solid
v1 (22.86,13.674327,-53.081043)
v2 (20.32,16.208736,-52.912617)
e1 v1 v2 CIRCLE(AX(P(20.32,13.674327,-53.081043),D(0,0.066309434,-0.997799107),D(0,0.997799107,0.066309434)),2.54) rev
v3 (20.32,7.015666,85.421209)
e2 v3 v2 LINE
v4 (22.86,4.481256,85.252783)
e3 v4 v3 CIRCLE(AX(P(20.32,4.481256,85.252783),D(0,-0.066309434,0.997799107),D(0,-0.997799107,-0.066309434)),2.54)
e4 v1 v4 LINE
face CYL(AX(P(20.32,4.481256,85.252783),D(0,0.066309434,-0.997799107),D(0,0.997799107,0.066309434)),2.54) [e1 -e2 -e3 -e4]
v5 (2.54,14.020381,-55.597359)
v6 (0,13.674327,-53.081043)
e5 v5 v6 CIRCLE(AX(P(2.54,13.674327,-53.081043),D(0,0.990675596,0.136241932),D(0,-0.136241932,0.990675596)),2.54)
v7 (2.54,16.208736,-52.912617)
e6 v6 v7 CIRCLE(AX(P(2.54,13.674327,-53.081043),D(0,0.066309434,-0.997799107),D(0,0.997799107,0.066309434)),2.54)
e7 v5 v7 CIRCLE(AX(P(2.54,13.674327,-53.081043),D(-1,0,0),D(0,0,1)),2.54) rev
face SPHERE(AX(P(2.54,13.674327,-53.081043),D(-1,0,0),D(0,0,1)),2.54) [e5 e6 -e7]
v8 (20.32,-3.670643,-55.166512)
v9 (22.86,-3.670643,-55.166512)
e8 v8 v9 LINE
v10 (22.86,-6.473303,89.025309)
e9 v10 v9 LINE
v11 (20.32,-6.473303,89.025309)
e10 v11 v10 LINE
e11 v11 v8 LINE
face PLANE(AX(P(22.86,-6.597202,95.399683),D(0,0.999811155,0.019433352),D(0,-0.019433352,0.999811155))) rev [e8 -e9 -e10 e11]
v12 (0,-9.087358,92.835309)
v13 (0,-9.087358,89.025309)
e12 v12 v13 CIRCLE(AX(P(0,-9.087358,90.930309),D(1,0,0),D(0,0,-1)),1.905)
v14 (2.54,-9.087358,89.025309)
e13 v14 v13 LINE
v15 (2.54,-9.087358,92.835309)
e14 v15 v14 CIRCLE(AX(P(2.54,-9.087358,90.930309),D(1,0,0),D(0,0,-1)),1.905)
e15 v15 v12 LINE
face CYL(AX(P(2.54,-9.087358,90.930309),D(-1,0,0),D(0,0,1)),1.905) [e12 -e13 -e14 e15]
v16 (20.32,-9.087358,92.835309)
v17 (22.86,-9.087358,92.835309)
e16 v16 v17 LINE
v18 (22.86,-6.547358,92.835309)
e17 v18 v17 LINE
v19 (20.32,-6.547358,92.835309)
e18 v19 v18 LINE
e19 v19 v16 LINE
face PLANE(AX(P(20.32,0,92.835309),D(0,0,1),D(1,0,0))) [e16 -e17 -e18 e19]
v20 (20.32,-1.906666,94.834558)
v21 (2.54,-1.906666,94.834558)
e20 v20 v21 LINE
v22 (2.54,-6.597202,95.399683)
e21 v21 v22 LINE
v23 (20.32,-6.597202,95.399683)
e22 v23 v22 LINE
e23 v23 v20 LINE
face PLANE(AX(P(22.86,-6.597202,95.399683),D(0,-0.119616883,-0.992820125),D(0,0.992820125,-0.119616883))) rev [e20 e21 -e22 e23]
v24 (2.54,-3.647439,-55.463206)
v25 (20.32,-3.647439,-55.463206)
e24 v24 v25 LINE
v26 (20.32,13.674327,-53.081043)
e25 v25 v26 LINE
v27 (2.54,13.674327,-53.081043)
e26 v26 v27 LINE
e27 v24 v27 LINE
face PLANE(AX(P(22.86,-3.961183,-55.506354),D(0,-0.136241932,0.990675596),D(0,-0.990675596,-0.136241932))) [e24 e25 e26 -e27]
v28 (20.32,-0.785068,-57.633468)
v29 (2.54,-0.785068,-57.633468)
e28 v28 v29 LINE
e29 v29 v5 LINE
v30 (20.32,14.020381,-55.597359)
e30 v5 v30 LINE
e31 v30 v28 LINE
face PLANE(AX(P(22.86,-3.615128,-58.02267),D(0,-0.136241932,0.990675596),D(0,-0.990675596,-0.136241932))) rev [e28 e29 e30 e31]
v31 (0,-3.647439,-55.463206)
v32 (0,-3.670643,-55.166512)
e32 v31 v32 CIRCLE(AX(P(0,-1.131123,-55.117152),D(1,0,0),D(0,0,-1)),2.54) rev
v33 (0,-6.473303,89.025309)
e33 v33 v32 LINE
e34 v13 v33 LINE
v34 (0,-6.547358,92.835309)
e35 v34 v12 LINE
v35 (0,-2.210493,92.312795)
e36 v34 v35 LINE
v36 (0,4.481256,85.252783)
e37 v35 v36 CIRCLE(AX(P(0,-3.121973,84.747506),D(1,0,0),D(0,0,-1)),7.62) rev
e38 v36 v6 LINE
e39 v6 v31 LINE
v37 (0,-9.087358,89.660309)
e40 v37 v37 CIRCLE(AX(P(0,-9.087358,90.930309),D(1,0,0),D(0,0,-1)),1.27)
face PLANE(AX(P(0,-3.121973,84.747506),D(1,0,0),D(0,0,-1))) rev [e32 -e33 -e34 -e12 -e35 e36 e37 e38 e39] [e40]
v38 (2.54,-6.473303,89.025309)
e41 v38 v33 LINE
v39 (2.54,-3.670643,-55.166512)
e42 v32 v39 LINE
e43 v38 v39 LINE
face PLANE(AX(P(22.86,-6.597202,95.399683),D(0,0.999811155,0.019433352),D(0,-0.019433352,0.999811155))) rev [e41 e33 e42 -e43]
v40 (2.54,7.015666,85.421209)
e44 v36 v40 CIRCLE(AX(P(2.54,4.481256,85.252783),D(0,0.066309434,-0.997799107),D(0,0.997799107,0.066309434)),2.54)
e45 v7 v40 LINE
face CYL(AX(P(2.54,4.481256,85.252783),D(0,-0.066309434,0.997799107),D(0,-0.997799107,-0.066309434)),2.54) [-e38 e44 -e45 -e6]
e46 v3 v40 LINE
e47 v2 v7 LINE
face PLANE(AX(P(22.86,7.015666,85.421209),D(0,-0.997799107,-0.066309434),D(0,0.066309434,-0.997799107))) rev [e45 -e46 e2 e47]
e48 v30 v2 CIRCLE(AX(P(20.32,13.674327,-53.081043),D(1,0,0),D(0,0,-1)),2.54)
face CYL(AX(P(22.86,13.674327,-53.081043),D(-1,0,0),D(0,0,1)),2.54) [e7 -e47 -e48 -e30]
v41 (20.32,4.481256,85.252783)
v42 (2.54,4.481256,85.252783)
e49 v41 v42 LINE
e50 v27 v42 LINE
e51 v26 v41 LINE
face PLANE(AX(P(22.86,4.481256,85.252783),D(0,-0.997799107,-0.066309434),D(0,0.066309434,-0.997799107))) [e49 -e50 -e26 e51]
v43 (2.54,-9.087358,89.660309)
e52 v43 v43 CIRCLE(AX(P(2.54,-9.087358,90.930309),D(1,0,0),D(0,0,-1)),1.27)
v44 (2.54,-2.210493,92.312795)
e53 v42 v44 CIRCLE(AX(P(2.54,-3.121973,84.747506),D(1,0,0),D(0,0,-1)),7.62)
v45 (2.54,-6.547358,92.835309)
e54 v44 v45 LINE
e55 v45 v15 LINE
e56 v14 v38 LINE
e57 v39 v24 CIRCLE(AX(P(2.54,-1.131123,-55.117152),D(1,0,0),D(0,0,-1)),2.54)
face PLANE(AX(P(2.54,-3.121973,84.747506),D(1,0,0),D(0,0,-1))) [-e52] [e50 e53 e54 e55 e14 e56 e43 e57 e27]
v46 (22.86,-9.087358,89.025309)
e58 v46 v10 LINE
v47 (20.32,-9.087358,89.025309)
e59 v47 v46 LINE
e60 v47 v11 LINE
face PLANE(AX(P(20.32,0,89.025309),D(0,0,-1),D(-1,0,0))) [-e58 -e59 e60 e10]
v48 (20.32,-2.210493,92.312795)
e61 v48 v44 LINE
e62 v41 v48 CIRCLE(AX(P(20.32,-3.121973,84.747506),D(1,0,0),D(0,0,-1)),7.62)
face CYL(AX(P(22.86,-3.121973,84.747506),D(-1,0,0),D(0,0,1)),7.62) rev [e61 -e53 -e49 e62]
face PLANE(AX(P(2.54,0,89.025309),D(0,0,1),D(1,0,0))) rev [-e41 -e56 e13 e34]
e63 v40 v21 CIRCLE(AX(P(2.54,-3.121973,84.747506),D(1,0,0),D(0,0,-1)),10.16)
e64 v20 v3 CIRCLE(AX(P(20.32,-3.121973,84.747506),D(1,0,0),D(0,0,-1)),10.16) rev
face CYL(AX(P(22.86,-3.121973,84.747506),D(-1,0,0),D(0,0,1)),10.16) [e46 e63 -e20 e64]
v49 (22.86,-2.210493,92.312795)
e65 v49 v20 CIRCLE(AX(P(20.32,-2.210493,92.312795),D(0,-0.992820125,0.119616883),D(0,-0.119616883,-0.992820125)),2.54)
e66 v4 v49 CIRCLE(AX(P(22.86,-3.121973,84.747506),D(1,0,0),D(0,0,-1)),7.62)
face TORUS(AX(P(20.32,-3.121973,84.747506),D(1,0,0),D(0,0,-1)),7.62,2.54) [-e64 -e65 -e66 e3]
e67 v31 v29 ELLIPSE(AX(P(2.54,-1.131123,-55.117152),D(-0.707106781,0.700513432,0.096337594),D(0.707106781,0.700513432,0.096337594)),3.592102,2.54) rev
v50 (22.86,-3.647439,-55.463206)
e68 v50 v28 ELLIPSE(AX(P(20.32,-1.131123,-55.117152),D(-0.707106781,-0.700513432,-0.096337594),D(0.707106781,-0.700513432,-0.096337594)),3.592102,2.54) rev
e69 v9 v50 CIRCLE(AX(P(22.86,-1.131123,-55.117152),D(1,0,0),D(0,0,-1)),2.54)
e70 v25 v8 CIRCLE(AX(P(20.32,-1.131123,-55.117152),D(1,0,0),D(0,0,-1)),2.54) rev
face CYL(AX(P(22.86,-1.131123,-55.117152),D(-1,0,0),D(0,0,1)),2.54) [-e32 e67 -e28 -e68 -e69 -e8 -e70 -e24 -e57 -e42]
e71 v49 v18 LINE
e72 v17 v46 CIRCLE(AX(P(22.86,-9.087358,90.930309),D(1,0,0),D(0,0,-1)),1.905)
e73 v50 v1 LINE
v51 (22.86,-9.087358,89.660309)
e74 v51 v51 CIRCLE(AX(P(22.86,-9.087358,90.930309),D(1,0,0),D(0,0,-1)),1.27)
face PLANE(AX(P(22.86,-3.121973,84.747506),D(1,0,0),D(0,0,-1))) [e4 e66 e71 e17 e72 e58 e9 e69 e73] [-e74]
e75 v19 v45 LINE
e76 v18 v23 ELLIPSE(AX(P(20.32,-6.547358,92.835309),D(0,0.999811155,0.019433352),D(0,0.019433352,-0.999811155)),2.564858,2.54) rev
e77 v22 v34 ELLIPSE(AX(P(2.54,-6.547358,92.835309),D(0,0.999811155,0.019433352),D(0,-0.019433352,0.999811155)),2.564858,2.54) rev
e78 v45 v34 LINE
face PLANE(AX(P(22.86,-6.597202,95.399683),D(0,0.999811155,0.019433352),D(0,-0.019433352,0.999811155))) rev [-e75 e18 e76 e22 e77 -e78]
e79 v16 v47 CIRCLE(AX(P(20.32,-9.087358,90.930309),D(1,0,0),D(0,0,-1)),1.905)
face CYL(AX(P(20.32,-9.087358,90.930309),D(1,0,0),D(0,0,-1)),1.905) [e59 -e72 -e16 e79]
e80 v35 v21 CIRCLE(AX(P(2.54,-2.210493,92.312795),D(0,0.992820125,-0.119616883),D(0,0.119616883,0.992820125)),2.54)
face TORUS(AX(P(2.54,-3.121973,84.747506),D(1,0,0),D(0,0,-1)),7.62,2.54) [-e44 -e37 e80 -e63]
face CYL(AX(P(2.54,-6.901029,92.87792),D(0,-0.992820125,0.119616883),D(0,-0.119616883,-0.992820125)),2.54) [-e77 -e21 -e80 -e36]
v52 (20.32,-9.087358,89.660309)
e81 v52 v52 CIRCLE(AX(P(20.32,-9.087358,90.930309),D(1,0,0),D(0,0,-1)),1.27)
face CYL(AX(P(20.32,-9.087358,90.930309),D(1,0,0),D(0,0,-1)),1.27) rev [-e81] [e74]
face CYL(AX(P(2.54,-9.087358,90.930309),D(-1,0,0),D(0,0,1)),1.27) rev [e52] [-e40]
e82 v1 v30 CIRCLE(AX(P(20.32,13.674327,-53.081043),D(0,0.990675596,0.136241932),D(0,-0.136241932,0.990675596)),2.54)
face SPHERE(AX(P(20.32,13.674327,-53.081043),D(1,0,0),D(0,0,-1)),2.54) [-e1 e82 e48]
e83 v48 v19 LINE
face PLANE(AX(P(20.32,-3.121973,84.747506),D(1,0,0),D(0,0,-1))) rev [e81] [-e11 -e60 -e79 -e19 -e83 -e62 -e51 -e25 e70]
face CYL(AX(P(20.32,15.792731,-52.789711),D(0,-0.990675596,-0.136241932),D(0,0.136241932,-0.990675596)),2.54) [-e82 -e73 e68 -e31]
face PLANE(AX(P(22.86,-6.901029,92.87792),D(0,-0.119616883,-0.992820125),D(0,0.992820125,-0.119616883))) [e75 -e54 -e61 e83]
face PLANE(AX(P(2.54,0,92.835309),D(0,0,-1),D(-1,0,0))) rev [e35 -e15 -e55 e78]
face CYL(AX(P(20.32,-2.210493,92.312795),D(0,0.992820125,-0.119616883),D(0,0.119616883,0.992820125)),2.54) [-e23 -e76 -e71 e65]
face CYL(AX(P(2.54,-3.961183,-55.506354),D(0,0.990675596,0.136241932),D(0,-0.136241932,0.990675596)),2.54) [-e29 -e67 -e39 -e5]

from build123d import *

# Parameters (mm, degrees)
BOSS_EXTRUDE1_DEPTH = 22.86
SHELL3_T            = -2.54
SKETCH2_R           = 1.27
BOSS_EXTRUDE2_DEPTH = 2.54
FILLET2_R           = 2.54


with BuildPart() as part:
    # Sketch1 → Boss-Extrude1 (new body)
    with BuildSketch(Plane(origin=(0, 0, 0), x_dir=(0, 0, -1), z_dir=(1, 0, 0))):
        with BuildLine():
            Line((-95.3996828, -6.597201831), (58.022669589, -3.615128074))
            Line((58.022669589, -3.615128074), (55.274818438, 16.365717982))
            Line((55.274818438, 16.365717982), (-85.421209368, 7.015665501))
            ThreePointArc((-85.421209368, 7.015665501), (-91.73681654, 4.25197608), (-94.834557989, -1.906665904))
            Line((-94.834557989, -1.906665904), (-95.3996828, -6.597201831))
        make_face()
    extrude(amount=BOSS_EXTRUDE1_DEPTH)

    # Shell3
    shell3_openings = [part.faces().sort_by_distance(p)[0] for p in [
        (11.43, -5.106164953, 18.688506605),
    ]]
    offset(amount=SHELL3_T, openings=shell3_openings, kind=Kind.INTERSECTION)

    # Sketch2 → Boss-Extrude2 (add)
    with BuildSketch(Plane(origin=(22.86, 0, 0), x_dir=(0, 0, -1), z_dir=(1, 0, 0))):
        with BuildLine():
            Line((-89.025308756, -6.473302977), (-92.835308756, -6.547358034))
            Line((-92.835308756, -6.547358034), (-92.835308756, -9.087358034))
            ThreePointArc((-92.835308756, -9.087358034), (-90.930308756, -10.992358034), (-89.025308756, -9.087358034))
            Line((-89.025308756, -9.087358034), (-89.025308756, -6.473302977))
        make_face()
        with Locations((-90.930308756, -9.087358034)):
            Circle(SKETCH2_R, mode=Mode.SUBTRACT)
    boss_extrude2 = extrude(amount=-BOSS_EXTRUDE2_DEPTH)

    # Mirror1: Boss-Extrude2 across plane
    add(boss_extrude2.mirror(Plane.ZY.offset(-11.43)))

    # Fillet2
    # the kernel refuses this fillet: 2.54 mm, written as the material it takes off along each edge
    with BuildSketch(Plane(origin=(2.54, 13.674326521, -53.081043163), x_dir=(0, 0.1362419322973002, -0.9906755956840251), z_dir=(-1, 0, 0))) as fillet2_piece_1_section:
        Polygon((0, 0), (FILLET2_R, 0), (FILLET2_R, -FILLET2_R * 0.932051833184), (FILLET2_R * 0.0702509400666, -FILLET2_R * 0.997529350656), align=None)
    fillet2_piece_1 = extrude(amount=FILLET2_R, mode=Mode.PRIVATE)
    fillet2_piece_1 = fillet2_piece_1 - Plane(origin=(2.54, 13.674326521, -53.081043163), x_dir=(0, -0.7751236084755375, 0.6318096165648808), z_dir=(-1, 0, 0)) * Sphere(FILLET2_R, mode=Mode.PRIVATE)
    add(fillet2_piece_1, mode=Mode.SUBTRACT)
    with BuildSketch(Plane(origin=(20.32, 13.674326521, -53.081043163), x_dir=(0, 0.1362419322973002, -0.9906755956840251), z_dir=(1, 0, 0))) as fillet2_piece_2_section:
        Polygon((0, 0), (FILLET2_R, 0), (FILLET2_R, FILLET2_R * 0.932051833184), (FILLET2_R * 0.0702509400666, FILLET2_R * 0.997529350656), align=None)
    fillet2_piece_2 = extrude(amount=FILLET2_R, mode=Mode.PRIVATE)
    fillet2_piece_2 = fillet2_piece_2 - Plane(origin=(20.32, 13.674326521, -53.081043163), x_dir=(0, -0.7751236084755375, 0.6318096165648808), z_dir=(1, 0, 0)) * Sphere(FILLET2_R, mode=Mode.PRIVATE)
    add(fillet2_piece_2, mode=Mode.SUBTRACT)
    with BuildSketch(Plane(origin=(0, -1.906665904, 94.834557989), x_dir=(0, -0.11961688257849476, -0.992820125401476), z_dir=(0, -0.992820125401476, 0.11961688257849475))) as fillet2_piece_3:
        with BuildLine():
            CenterArc((FILLET2_R, FILLET2_R), FILLET2_R, 180, 90)
            Line((0, FILLET2_R), (0, 0))
            Line((0, 0), (FILLET2_R, 0))
        make_face()
    extrude(amount=11.074456935, mode=Mode.SUBTRACT)
    with BuildSketch(Plane(origin=(22.86, -1.906665904, 94.834557989), x_dir=(0, -0.11961688257849476, -0.992820125401476), z_dir=(0, -0.992820125401476, 0.11961688257849475))) as fillet2_piece_4:
        with BuildLine():
            CenterArc((FILLET2_R, -FILLET2_R), FILLET2_R, 90, 90)
            Line((0, -FILLET2_R), (0, 0))
            Line((0, 0), (FILLET2_R, 0))
        make_face()
    extrude(amount=11.074456935, mode=Mode.SUBTRACT)
    with BuildSketch(Plane(origin=(0, -3.121973431, 84.747505515), x_dir=(0, 0.9977991074935991, 0.06630943435874734), z_dir=(0, 0.06630943435874734, -0.9977991074935991))) as fillet2_piece_5:
        with BuildLine():
            CenterArc((10.16 - FILLET2_R, FILLET2_R), FILLET2_R, 270, 90)
            Line((10.16, FILLET2_R), (10.16, 0))
            Line((10.16, 0), (10.16 - FILLET2_R, 0))
        make_face()
    revolve(axis=Axis((0, -3.121973431, 84.747505515), (1, 0, 0)), revolution_arc=79.327967258, mode=Mode.SUBTRACT)
    with BuildSketch(Plane(origin=(22.86, -3.121973431, 84.747505515), x_dir=(0, 0.9977991074935991, 0.06630943435874734), z_dir=(0, 0.06630943435874734, -0.9977991074935991))) as fillet2_piece_6:
        with BuildLine():
            CenterArc((10.16 - FILLET2_R, -FILLET2_R), FILLET2_R, 0, 90)
            Line((10.16, -FILLET2_R), (10.16, 0))
            Line((10.16, 0), (10.16 - FILLET2_R, 0))
        make_face()
    revolve(axis=Axis((22.86, -3.121973431, 84.747505515), (1, 0, 0)), revolution_arc=79.327967258, mode=Mode.SUBTRACT)
    with BuildSketch(Plane(origin=(-7.141741608, -3.615128074, -58.022669589), x_dir=(0, 0.9906755956840251, 0.13624193229729997), z_dir=(1, 0, 0))) as fillet2_piece_7:
        with BuildLine():
            CenterArc((FILLET2_R * 1.12468371782, FILLET2_R), FILLET2_R, 173.283078214, 96.716921786)
            Line((FILLET2_R * 0.131547569233, FILLET2_R * 1.11696405589), (0, 0))
            Line((0, 0), (FILLET2_R * 1.12468371782, 0))
        make_face()
    extrude(amount=37.143483216, mode=Mode.SUBTRACT)
    with BuildSketch(Plane(origin=(0, -9.905918107, -58.887805859), x_dir=(1, 0, 0), z_dir=(0, 0.9906755956840251, 0.1362419322973002))) as fillet2_piece_8:
        with BuildLine():
            CenterArc((FILLET2_R, -FILLET2_R), FILLET2_R, 90, 90)
            Line((0, -FILLET2_R), (0, 0))
            Line((0, 0), (FILLET2_R, 0))
        make_face()
    extrude(amount=24.151497464, mode=Mode.SUBTRACT)
    with BuildSketch(Plane(origin=(22.86, -9.905918107, -58.887805859), x_dir=(-1, 0, 0), z_dir=(0, 0.9906755956840251, 0.1362419322973002))) as fillet2_piece_9:
        with BuildLine():
            CenterArc((FILLET2_R, FILLET2_R), FILLET2_R, 180, 90)
            Line((0, FILLET2_R), (0, 0))
            Line((0, 0), (FILLET2_R, 0))
        make_face()
    extrude(amount=24.151497464, mode=Mode.SUBTRACT)
    with BuildSketch(Plane(origin=(2.54, 16.365717982, -55.274818438), x_dir=(0, -0.9906755956840249, -0.13624193229730105), z_dir=(1, 0, 0))) as fillet2_piece_10:
        with BuildLine():
            CenterArc((FILLET2_R * 0.932051833184, -FILLET2_R), FILLET2_R, 90, 85.971599492)
            Line((-FILLET2_R * 0.065477517472, -FILLET2_R * 0.929749059933), (0, 0))
            Line((0, 0), (FILLET2_R * 0.932051833184, 0))
        make_face()
    extrude(amount=17.78, mode=Mode.SUBTRACT)
    with BuildSketch(Plane(origin=(0, 16.208736254, -52.9126172), x_dir=(1, 0, 0), z_dir=(0, -0.06630943435875185, 0.9977991074935989))) as fillet2_piece_11:
        with BuildLine():
            CenterArc((FILLET2_R, -FILLET2_R), FILLET2_R, 90, 90)
            Line((0, -FILLET2_R), (0, 0))
            Line((0, 0), (FILLET2_R, 0))
        make_face()
    extrude(amount=138.638956008, mode=Mode.SUBTRACT)
    with BuildSketch(Plane(origin=(22.86, 16.208736254, -52.9126172), x_dir=(-1, 0, 0), z_dir=(0, -0.06630943435875185, 0.9977991074935989))) as fillet2_piece_12:
        with BuildLine():
            CenterArc((FILLET2_R, FILLET2_R), FILLET2_R, 180, 90)
            Line((0, FILLET2_R), (0, 0))
            Line((0, 0), (FILLET2_R, 0))
        make_face()
    extrude(amount=138.638956008, mode=Mode.SUBTRACT)


solid = part.part
